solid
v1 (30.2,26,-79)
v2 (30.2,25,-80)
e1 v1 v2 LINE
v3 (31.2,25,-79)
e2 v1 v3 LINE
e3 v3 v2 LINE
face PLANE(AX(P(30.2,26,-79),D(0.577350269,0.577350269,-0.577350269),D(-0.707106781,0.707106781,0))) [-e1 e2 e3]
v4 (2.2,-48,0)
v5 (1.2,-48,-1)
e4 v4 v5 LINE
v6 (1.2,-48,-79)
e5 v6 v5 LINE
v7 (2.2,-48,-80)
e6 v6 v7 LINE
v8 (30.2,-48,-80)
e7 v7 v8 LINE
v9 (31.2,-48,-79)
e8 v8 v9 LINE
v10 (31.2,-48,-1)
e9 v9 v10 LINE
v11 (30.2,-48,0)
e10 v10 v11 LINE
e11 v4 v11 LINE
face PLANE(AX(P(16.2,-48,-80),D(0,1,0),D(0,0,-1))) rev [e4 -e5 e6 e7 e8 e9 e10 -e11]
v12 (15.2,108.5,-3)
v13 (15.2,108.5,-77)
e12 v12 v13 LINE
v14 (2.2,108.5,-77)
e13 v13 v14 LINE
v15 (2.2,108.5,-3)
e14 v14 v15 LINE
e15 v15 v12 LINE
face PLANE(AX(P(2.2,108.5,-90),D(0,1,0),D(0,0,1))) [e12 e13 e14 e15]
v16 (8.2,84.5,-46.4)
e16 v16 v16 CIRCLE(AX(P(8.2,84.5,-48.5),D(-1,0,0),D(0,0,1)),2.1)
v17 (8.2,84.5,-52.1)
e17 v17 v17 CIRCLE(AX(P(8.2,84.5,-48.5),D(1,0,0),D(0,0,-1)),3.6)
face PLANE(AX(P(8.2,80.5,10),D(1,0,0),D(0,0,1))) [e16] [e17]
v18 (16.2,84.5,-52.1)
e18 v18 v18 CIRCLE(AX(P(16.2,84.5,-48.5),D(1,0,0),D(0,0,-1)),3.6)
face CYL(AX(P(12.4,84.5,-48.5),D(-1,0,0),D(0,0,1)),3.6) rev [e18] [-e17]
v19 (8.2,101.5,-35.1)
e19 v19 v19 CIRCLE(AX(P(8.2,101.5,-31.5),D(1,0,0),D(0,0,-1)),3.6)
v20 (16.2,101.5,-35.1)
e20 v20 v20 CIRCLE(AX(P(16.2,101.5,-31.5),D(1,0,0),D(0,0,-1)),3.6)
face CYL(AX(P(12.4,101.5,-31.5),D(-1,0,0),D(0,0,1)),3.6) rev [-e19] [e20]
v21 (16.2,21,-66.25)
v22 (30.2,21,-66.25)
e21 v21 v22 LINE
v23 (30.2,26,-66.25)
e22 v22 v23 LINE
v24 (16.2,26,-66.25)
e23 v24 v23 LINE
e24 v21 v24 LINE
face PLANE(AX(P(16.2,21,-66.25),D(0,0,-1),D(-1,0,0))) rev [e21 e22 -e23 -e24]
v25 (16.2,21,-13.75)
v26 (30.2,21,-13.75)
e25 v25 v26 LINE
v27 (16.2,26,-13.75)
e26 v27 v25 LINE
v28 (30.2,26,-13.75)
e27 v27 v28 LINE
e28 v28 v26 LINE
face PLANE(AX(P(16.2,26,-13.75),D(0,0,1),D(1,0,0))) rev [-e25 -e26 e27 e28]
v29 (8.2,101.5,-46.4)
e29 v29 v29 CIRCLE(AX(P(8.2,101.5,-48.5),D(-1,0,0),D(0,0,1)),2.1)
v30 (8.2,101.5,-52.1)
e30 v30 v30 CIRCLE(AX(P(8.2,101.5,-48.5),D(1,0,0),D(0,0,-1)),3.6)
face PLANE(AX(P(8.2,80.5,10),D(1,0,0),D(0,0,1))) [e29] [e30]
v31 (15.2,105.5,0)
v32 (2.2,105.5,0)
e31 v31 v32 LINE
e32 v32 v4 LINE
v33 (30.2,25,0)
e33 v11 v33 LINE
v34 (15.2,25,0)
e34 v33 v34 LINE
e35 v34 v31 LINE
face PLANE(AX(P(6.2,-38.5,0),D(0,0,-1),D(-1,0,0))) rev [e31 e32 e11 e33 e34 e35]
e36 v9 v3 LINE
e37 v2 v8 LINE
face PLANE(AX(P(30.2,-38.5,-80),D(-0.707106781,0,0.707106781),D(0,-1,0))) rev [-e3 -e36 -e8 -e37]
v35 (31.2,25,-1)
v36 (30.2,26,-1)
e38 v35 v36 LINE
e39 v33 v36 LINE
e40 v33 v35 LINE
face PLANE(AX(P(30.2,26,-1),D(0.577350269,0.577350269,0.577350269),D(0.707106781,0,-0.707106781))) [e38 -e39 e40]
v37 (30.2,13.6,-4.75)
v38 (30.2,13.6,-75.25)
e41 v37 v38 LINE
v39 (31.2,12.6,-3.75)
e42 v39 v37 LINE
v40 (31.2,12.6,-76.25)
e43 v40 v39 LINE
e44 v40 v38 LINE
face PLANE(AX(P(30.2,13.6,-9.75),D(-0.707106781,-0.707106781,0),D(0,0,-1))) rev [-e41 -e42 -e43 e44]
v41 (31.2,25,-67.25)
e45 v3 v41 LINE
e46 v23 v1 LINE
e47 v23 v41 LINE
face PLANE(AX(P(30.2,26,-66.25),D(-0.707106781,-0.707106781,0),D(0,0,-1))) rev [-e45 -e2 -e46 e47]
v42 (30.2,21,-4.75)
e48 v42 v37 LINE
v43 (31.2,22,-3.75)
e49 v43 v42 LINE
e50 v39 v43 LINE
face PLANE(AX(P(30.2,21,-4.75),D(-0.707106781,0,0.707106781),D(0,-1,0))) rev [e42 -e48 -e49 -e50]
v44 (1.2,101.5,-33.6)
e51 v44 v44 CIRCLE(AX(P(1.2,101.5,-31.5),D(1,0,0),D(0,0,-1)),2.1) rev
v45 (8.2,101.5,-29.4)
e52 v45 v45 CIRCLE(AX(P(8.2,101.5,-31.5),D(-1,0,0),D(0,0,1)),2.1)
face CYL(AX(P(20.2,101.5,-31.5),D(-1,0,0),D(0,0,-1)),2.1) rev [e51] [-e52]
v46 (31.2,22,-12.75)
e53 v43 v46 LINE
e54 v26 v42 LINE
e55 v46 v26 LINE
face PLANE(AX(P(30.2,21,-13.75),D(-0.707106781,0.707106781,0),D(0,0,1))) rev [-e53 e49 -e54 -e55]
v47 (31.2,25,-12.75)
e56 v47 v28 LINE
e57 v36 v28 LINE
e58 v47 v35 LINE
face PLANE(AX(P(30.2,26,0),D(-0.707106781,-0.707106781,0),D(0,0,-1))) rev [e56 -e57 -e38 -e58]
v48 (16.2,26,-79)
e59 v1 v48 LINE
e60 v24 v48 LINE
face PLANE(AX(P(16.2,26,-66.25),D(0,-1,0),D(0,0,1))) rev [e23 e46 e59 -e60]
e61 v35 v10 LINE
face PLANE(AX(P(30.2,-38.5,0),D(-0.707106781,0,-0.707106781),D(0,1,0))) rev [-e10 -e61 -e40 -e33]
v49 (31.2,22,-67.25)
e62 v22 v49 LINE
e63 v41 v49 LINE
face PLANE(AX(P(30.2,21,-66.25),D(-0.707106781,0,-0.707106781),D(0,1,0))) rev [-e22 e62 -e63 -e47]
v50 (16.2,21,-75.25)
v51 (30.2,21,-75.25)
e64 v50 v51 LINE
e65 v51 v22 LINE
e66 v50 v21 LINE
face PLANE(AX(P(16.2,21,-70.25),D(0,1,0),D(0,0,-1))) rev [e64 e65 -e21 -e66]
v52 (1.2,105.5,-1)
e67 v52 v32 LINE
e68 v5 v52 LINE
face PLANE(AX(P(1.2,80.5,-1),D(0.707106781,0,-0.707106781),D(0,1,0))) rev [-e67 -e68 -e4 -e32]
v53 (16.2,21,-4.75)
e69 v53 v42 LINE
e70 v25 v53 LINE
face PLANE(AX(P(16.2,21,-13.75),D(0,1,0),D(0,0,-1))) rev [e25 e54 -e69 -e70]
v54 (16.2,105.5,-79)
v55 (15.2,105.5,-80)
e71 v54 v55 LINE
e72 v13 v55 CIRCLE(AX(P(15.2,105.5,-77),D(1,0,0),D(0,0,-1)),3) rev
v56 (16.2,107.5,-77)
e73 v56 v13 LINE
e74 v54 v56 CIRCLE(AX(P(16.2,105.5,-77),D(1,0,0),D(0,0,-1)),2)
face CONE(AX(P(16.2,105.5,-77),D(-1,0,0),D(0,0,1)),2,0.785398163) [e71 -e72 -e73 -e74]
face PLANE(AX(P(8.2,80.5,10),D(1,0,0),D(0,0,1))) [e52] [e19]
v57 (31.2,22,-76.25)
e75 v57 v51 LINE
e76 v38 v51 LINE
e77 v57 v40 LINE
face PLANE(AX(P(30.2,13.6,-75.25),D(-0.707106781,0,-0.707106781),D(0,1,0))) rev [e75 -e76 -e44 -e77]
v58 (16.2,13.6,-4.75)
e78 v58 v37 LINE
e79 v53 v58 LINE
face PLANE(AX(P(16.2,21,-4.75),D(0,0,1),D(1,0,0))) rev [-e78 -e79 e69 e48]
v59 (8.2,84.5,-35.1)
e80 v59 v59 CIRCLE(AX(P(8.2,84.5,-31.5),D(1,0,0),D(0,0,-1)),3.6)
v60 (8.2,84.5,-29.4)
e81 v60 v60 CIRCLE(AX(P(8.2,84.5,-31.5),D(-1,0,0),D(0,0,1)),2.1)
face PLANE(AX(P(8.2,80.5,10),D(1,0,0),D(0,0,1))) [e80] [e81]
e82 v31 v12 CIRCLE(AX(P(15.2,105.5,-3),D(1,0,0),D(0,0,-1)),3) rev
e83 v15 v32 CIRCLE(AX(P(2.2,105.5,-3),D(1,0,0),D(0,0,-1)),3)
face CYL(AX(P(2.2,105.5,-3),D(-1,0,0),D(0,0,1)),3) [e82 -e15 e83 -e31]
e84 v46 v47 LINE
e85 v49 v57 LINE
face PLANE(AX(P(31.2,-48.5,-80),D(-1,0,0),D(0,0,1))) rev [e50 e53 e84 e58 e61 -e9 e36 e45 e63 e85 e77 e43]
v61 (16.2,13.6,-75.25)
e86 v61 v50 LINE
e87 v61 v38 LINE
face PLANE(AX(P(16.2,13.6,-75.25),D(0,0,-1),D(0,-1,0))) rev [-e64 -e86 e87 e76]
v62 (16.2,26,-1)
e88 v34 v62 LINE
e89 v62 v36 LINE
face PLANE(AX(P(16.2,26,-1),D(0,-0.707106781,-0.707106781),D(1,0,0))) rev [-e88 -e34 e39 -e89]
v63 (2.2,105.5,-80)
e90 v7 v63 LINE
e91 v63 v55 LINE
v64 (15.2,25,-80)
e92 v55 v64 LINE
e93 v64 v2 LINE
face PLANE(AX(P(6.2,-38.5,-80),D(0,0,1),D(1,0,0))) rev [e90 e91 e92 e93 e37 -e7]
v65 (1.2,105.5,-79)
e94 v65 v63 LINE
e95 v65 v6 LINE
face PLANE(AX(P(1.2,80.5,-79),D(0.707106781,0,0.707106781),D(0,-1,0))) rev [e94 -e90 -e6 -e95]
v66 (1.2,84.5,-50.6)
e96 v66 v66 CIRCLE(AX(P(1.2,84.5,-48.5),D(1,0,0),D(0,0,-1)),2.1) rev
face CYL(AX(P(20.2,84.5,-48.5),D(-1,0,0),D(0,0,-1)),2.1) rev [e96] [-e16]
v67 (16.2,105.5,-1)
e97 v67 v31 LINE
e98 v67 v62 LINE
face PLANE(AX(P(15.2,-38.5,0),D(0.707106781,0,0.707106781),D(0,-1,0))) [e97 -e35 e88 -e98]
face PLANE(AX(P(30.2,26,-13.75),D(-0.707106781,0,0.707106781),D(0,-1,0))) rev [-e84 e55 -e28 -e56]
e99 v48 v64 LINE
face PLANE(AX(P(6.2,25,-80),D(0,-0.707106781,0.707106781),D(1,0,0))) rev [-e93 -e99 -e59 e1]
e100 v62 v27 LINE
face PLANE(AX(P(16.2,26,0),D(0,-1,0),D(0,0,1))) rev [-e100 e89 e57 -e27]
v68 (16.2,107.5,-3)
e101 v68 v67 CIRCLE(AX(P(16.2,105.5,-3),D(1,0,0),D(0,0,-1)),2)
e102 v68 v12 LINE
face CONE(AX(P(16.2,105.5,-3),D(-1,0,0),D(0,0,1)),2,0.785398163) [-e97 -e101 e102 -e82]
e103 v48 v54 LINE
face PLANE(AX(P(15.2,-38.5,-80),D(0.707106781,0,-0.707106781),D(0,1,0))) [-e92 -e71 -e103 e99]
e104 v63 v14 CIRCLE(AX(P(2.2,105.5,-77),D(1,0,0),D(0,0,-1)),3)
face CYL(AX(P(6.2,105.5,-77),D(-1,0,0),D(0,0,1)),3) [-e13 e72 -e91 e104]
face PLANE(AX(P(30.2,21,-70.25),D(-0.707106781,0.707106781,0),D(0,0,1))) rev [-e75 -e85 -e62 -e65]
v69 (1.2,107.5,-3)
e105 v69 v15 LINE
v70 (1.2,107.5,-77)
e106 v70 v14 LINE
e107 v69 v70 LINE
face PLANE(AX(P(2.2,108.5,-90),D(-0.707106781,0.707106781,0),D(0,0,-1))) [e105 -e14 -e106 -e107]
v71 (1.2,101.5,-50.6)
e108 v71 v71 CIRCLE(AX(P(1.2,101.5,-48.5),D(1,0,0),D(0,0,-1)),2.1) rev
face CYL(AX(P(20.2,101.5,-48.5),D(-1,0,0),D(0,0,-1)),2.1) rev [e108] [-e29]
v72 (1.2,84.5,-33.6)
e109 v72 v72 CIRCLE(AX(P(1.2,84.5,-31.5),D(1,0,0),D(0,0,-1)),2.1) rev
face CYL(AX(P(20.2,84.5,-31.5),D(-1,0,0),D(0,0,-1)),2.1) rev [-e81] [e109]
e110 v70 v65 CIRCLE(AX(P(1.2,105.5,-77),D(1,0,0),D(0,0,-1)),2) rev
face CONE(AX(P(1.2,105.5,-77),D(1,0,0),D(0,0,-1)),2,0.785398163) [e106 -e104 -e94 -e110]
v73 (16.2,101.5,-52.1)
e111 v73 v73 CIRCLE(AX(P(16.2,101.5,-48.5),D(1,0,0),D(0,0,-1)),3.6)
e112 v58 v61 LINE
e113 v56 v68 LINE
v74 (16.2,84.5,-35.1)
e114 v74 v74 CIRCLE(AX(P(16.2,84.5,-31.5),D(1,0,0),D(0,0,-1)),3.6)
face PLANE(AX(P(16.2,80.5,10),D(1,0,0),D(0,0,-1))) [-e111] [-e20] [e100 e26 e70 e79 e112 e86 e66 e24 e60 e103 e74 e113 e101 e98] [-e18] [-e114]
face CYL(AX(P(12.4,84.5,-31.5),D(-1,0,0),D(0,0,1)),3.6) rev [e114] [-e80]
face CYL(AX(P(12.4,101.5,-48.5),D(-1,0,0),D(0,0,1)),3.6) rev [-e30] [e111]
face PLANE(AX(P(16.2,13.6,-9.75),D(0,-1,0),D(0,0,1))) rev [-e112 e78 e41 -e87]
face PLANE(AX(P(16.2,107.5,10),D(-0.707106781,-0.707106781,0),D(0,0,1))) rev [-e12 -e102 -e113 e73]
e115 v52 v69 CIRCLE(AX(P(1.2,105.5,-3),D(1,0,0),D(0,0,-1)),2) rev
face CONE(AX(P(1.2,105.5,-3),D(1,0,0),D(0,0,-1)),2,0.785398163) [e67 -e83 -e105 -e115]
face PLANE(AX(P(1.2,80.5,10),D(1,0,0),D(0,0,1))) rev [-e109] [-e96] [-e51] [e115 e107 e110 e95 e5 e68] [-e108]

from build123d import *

# Parameters (mm, degrees)
SKETCH1_W               = 100
SKETCH1_H               = 26
BOSS_EXTRUDE1_DEPTH     = 2
BOSS_EXTRUDE2_DEPTH     = 100
SKETCH3_W               = 25
SKETCH3_H               = 28
BOSS_EXTRUDE3_DEPTH     = 4
SKETCH4_R               = 2.1
CUT_EXTRUDE1_DEPTH      = 106.39449701
CUT_EXTRUDE2_DEPTH      = 105.537074763
CUT_EXTRUDE2_DEPTH_BACK = 105.537074763
SKETCH5_W               = 120
SKETCH5_H               = 46
SKETCH5_W_2             = 100
SKETCH5_H_2             = 26
SKETCH6_W               = 100
SKETCH6_H               = 26
SKETCH6_R               = 3.6
BOSS_EXTRUDE4_DEPTH     = 4.2
SKETCH8_W               = 100
SKETCH8_H               = 4
BOSS_EXTRUDE5_DEPTH     = 6
SKETCH9_W               = 100
SKETCH9_H               = 4
BOSS_EXTRUDE6_DEPTH     = 10.2
SKETCH10_W              = 4
SKETCH10_H              = 37.5
CUT_EXTRUDE3_DEPTH      = 106.682732743
SKETCH11_W              = 4
SKETCH11_H              = 25
CUT_EXTRUDE4_DEPTH      = 107.737247482
SKETCH13_W              = 10
SKETCH13_H              = 10
BOSS_EXTRUDE7_DEPTH     = 6.2
SKETCH14_W              = 4.2
SKETCH14_H              = 35.5
CUT_EXTRUDE5_DEPTH      = 107.737247482
SKETCH15_W              = 6
SKETCH15_H              = 100
CUT_EXTRUDE6_DEPTH      = 109.576424697
PODPORA_START           = -80
PODPORA_DEPTH           = 80
PODPORA_2_OUTLINE_W     = 10
PODPORA_2_OUTLINE_H     = 12.4
PODPORA_2_DEPTH         = 9.75
PODPORA_START_2         = -9.75
PODPORA_3_OUTLINE_W     = 10
PODPORA_3_OUTLINE_H     = 12.4
PODPORA_3_DEPTH         = 9.75
PODPORA_START_3         = -70.25
PODPORA_4_OUTLINE_W     = 10
PODPORA_4_OUTLINE_H     = 5
PODPORA_4_DEPTH         = 4
PODPORA_START_4         = -13.75
PODPORA_5_OUTLINE_W     = 10
PODPORA_5_OUTLINE_H     = 5
PODPORA_5_DEPTH         = 4
SKETCH16_W              = 80
SKETCH16_H              = 115
BOSS_EXTRUDE8_DEPTH     = 10
MOVE_FACE1_BY           = 10
MOVE_FACE2_BY           = 5
SKETCH17_W              = 10
SKETCH17_H              = 30
CUT_EXTRUDE7_DEPTH      = 150.52822476
MOVE_START              = 12.4
MOVE_FACE3_OUTLINE_R    = 3.6
MOVE_FACE3_DEPTH        = 3.8
SKETCH18_W              = 35.995257081
SKETCH18_H              = 98.541471116
CUT_EXTRUDE8_DEPTH      = 178.196049617
MOVE_FACE4_BY           = 4
DELETEFACE1_START       = 6.2
DELETEFACE1_OUTLINE_W   = 30
DELETEFACE1_OUTLINE_H   = 25.5
DELETEFACE1_DEPTH       = 4.2
SKETCH19_W              = 80
SKETCH19_H              = 10
CUT_EXTRUDE9_DEPTH      = 136.525827797
MOVE_START_2            = 106.5
MOVE_FACE5_OUTLINE_W    = 10
MOVE_FACE5_OUTLINE_H    = 80
MOVE_FACE5_DEPTH        = 2
FILLET1_R               = 3
MOVE_START_3            = -48.5
MOVE_FACE6_OUTLINE_W    = 25
MOVE_FACE6_OUTLINE_H    = 80
MOVE_FACE6_DEPTH        = 0.5
MOVE_START_4            = 1.2
MOVE_FACE7_OUTLINE_R    = 2.1
MOVE_FACE7_DEPTH        = 5
MOVE_FACE8_BY           = 5
MOVE_FACE8_2_BY         = 5
CHAMFER1_SIZE           = 1


with BuildPart() as part:
    # Sketch1 → Boss-Extrude1 (new body)
    with BuildSketch(Plane(origin=(0, 0, 0), x_dir=(0, 0, -1), z_dir=(1, 0, 0))):
        with Locations((50, 13)):
            Rectangle(SKETCH1_W, SKETCH1_H)
    extrude(amount=BOSS_EXTRUDE1_DEPTH)

    # Sketch2 → Boss-Extrude2 (add)
    with BuildSketch(Plane.XY):
        Polygon((2, 26), (2, 28), (-12, 28), (-12, 24), (-10, 24), (-10, 26), align=None)
    extrude(amount=-BOSS_EXTRUDE2_DEPTH)

    # Sketch3 → Boss-Extrude3 (add)
    with BuildSketch(Plane(origin=(2, 0, 0), x_dir=(0, 0, -1), z_dir=(1, 0, 0))):
        with Locations((50, 14)):
            Rectangle(SKETCH3_W, SKETCH3_H)
    extrude(amount=BOSS_EXTRUDE3_DEPTH)

    # Sketch4 → Cut-Extrude1 (cut, through all)
    with BuildSketch(Plane(origin=(6, 0, 0), x_dir=(0, 0, -1), z_dir=(1, 0, 0))):
        with Locations((41.5, 21)):
            Circle(SKETCH4_R)
        with Locations((58.5, 21)):
            Circle(SKETCH4_R)
        with Locations((58.5, 4)):
            Circle(SKETCH4_R)
        with Locations((41.5, 4)):
            Circle(SKETCH4_R)
    extrude(amount=-CUT_EXTRUDE1_DEPTH, mode=Mode.SUBTRACT)


with BuildPart() as body_2:
    # Mirror1: mirrored copy
    add(part.part.mirror(Plane(origin=(6, 0, 0), x_dir=(0, 0, 1), z_dir=(1, 0, 0))))

    # Sketch5 → Cut-Extrude2 (cut, two sides: drawn at the far end of the back side and taken through both)
    with BuildSketch(Plane(origin=(12, 0, 0), x_dir=(0, 0, -1), z_dir=(1, 0, 0)).offset(-CUT_EXTRUDE2_DEPTH_BACK)):
        with Locations((50, 13)):
            Rectangle(SKETCH5_W, SKETCH5_H)
        with Locations((50, 13)):
            Rectangle(SKETCH5_W_2, SKETCH5_H_2, mode=Mode.SUBTRACT)
    extrude(amount=CUT_EXTRUDE2_DEPTH + CUT_EXTRUDE2_DEPTH_BACK, mode=Mode.SUBTRACT)


with BuildPart() as body_2_2:
    # of the pieces the cut leaves, the one that is kept (cut_extrude2_keep)
    add(body_2.part.solids().sort_by_distance((12, 0, 0))[0])

    # Sketch6 → Boss-Extrude4 (add)
    with BuildSketch(Plane(origin=(12, 0, 0), x_dir=(0, 0, -1), z_dir=(1, 0, 0))):
        with Locations((50, 13)):
            Rectangle(SKETCH6_W, SKETCH6_H)
        with Locations((41.5, 21)):
            Circle(SKETCH6_R, mode=Mode.SUBTRACT)
        with Locations((58.5, 21)):
            Circle(SKETCH6_R, mode=Mode.SUBTRACT)
        with Locations((58.5, 4)):
            Circle(SKETCH6_R, mode=Mode.SUBTRACT)
        with Locations((41.5, 4)):
            Circle(SKETCH6_R, mode=Mode.SUBTRACT)
    extrude(amount=BOSS_EXTRUDE4_DEPTH)



with BuildPart() as body_2_3:
    # Sketch8 → Boss-Extrude5 (new body)
    with BuildSketch(Plane(origin=(16.2, 0, 0), x_dir=(0, 0, -1), z_dir=(1, 0, 0))):
        with Locations((50, -2)):
            Rectangle(SKETCH8_W, SKETCH8_H)
    extrude(amount=BOSS_EXTRUDE5_DEPTH)


with BuildPart() as body_2_2_1:
    add(body_2_2.part)

    add(body_2_3.part)  # Boss-Extrude6 merges body 2 3
    # Sketch9 → Boss-Extrude6 (add)
    with BuildSketch(Plane.ZY.offset(-16.2)):
        with Locations((-50, -2)):
            Rectangle(SKETCH9_W, SKETCH9_H)
    extrude(amount=BOSS_EXTRUDE6_DEPTH)

    # Sketch10 → Cut-Extrude3 (cut, through all)
    with BuildSketch(Plane(origin=(0, 0, 0), x_dir=(1, 0, 0), z_dir=(0, 1, 0))):
        with Locations((8, 81.25)):
            Rectangle(SKETCH10_W, SKETCH10_H)
        with Locations((8, 18.75)):
            Rectangle(SKETCH10_W, SKETCH10_H)
    extrude(amount=-CUT_EXTRUDE3_DEPTH, mode=Mode.SUBTRACT)

    # Sketch11 → Cut-Extrude4 (cut, through all)
    with BuildSketch(Plane(origin=(0, 26, 0), x_dir=(1, 0, 0), z_dir=(0, 1, 0))):
        with Locations((8, 50)):
            Rectangle(SKETCH11_W, SKETCH11_H)
    extrude(amount=-CUT_EXTRUDE4_DEPTH, mode=Mode.SUBTRACT)

    # Sketch13 → Boss-Extrude7 (add)
    with BuildSketch(Plane.ZY.offset(-10)):
        with Locations((-50, 31)):
            Rectangle(SKETCH13_W, SKETCH13_H)
    extrude(amount=-BOSS_EXTRUDE7_DEPTH)

    # Sketch14 → Cut-Extrude5 (cut, through all)
    with BuildSketch(Plane(origin=(0, 26, 0), x_dir=(1, 0, 0), z_dir=(0, 1, 0))):
        with Locations((12.1, 17.75)):
            Rectangle(SKETCH14_W, SKETCH14_H)
        with Locations((12.1, 82.25)):
            Rectangle(SKETCH14_W, SKETCH14_H)
    extrude(amount=-CUT_EXTRUDE5_DEPTH, mode=Mode.SUBTRACT)

    # Sketch15 → Cut-Extrude6 (cut, through all)
    with BuildSketch(Plane(origin=(0, 0, 0), x_dir=(1, 0, 0), z_dir=(0, 1, 0))):
        with Locations((19.2, 50)):
            Rectangle(SKETCH15_W, SKETCH15_H)
    extrude(amount=-CUT_EXTRUDE6_DEPTH, mode=Mode.SUBTRACT)


with BuildPart() as body_2_4:
    # podpora: read off the stored shape, not the designer's step
    # podpora outline → podpora (new body)
    with BuildSketch(Plane.XY.offset(PODPORA_START)):
        Polygon((-3.8, -48.5), (26.2, -48.5), (26.2, 13.6), (16.2, 13.6), (16.2, -38.5), (-3.8, -38.5), align=None)
    extrude(amount=PODPORA_DEPTH)

    # podpora 2 outline → podpora 2 (add)
    with BuildSketch(Plane.XY.offset(PODPORA_START)):
        with Locations((21.2, 19.8)):
            Rectangle(PODPORA_2_OUTLINE_W, PODPORA_2_OUTLINE_H)
    extrude(amount=PODPORA_2_DEPTH)

    # podpora 3 outline → podpora 3 (add)
    with BuildSketch(Plane.XY.offset(PODPORA_START_2)):
        with Locations((21.2, 19.8)):
            Rectangle(PODPORA_3_OUTLINE_W, PODPORA_3_OUTLINE_H)
    extrude(amount=PODPORA_3_DEPTH)

    # podpora 4 outline → podpora 4 (add)
    with BuildSketch(Plane.XY.offset(PODPORA_START_3)):
        with Locations((21.2, 23.5)):
            Rectangle(PODPORA_4_OUTLINE_W, PODPORA_4_OUTLINE_H)
    extrude(amount=PODPORA_4_DEPTH)

    # podpora 5 outline → podpora 5 (add)
    with BuildSketch(Plane.XY.offset(PODPORA_START_4)):
        with Locations((21.2, 23.5)):
            Rectangle(PODPORA_5_OUTLINE_W, PODPORA_5_OUTLINE_H)
    extrude(amount=PODPORA_5_DEPTH)

    # Move Face1: a face moved outward by 10.0
    extrude(body_2_4.faces().sort_by_distance((-3.8, -43.5, -40))[0], amount=MOVE_FACE1_BY, dir=(-1, 0, 0))

    # Move Face2: a face moved outward by 5.0
    extrude(body_2_4.faces().sort_by_distance((26.2, -15.422294183, -40))[0], amount=MOVE_FACE2_BY, dir=(1, 0, 0))


with BuildPart() as body_2_2_2:
    # Body-Move/Copy3: moved
    add(body_2_2_1.part.moved(Location((0, 0, 10))))


with BuildPart() as body_2_2_3:
    # Body-Move/Copy4: read off the stored shape, not the designer's step
    # Body-Move/Copy4: moved
    add(body_2_2_2.part.moved(Location((0, 17.6, 0))))


with BuildPart() as body_3:
    # Sketch16 → Boss-Extrude8 (new body)
    with BuildSketch(Plane.ZY.offset(-16.2)):
        with Locations((-40, 19)):
            Rectangle(SKETCH16_W, SKETCH16_H)
    extrude(amount=BOSS_EXTRUDE8_DEPTH)

    # Combine1: union body 2 4
    add(body_2_4.part)


with BuildPart() as body_2_2_4:
    # Body-Move/Copy5: read off the stored shape, not the designer's step
    # Body-Move/Copy5: moved
    add(body_2_2_3.part.moved(Location((0, 62.9, 0))))


with BuildPart() as body_2_2_5:
    # Body-Move/Copy6: read off the stored shape, not the designer's step
    # Body-Move/Copy6: moved
    add(body_2_2_4.part.moved(Location((-3.8, 0, 0))))

    # Combine2: union body 3
    add(body_3.part)

    # Sketch17 → Cut-Extrude7 (cut, through all)
    with BuildSketch(Plane(origin=(12.4, 0, 0), x_dir=(0, 0, -1), z_dir=(1, 0, 0))):
        with Locations((-5, 91.5)):
            Rectangle(SKETCH17_W, SKETCH17_H)
        with Locations((85, 91.5)):
            Rectangle(SKETCH17_W, SKETCH17_H)
    extrude(amount=-CUT_EXTRUDE7_DEPTH, mode=Mode.SUBTRACT)

    # Move Face3: read off the stored shape, not the designer's step
    # Move Face3 outline → Move Face3 (add)
    with BuildSketch(Plane.YZ.offset(MOVE_START)):
        Polygon((116.5, -35), (106.5, -35), (106.5, 0), (76.5, 0), (76.5, -80), (106.5, -80), (106.5, -45), (116.5, -45), align=None)
        with Locations((84.5, -48.5)):
            Circle(MOVE_FACE3_OUTLINE_R, mode=Mode.SUBTRACT)
        with Locations((101.5, -48.5)):
            Circle(MOVE_FACE3_OUTLINE_R, mode=Mode.SUBTRACT)
        with Locations((84.5, -31.5)):
            Circle(MOVE_FACE3_OUTLINE_R, mode=Mode.SUBTRACT)
        with Locations((101.5, -31.5)):
            Circle(MOVE_FACE3_OUTLINE_R, mode=Mode.SUBTRACT)
    extrude(amount=MOVE_FACE3_DEPTH)

    # Sketch18 → Cut-Extrude8 (cut, through all)
    with BuildSketch(Plane(origin=(0, 106.5, 0), x_dir=(1, 0, 0), z_dir=(0, 1, 0))):
        with Locations((13.065761379, 40)):
            Rectangle(SKETCH18_W, SKETCH18_H)
    extrude(amount=CUT_EXTRUDE8_DEPTH, mode=Mode.SUBTRACT)

    # Move Face4: a face moved outward by 4.0
    extrude(body_2_2_5.faces().sort_by_distance((-13.8, -43.5, -40))[0], amount=MOVE_FACE4_BY, dir=(-1, 0, 0))

    # DeleteFace1: read off the stored shape, not the designer's step
    # DeleteFace1 outline → DeleteFace1 (add)
    with BuildSketch(Plane.YZ.offset(DELETEFACE1_START)):
        with Locations((91.5, -67.25)):
            Rectangle(DELETEFACE1_OUTLINE_W, DELETEFACE1_OUTLINE_H)
        with Locations((91.5, -12.75)):
            Rectangle(DELETEFACE1_OUTLINE_W, DELETEFACE1_OUTLINE_H)
    extrude(amount=DELETEFACE1_DEPTH)

    # Sketch19 → Cut-Extrude9 (cut, through all)
    with BuildSketch(Plane.ZY.offset(-6.2)):
        with Locations((-40, -43.5)):
            Rectangle(SKETCH19_W, SKETCH19_H)
    extrude(amount=CUT_EXTRUDE9_DEPTH, mode=Mode.SUBTRACT)

    # Move Face5: read off the stored shape, not the designer's step
    # Move Face5 outline → Move Face5 (add)
    with BuildSketch(Plane(origin=(0, 0, 0), x_dir=(1, 0, 0), z_dir=(0, 1, 0)).offset(MOVE_START_2)):
        with Locations((11.2, 40)):
            Rectangle(MOVE_FACE5_OUTLINE_W, MOVE_FACE5_OUTLINE_H)
    extrude(amount=MOVE_FACE5_DEPTH)

    # Fillet1
    fillet1_edges = [body_2_2_5.edges().sort_by_distance(p)[0] for p in [
        (11.2, 108.5, 0),
        (11.2, 108.5, -80),
    ]]
    fillet(fillet1_edges, radius=FILLET1_R)

    # Move Face6: read off the stored shape, not the designer's step
    # Move Face6 outline → Move Face6 (cut)
    with BuildSketch(Plane(origin=(0, 0, 0), x_dir=(1, 0, 0), z_dir=(0, 1, 0)).offset(MOVE_START_3)):
        with Locations((18.7, 40)):
            Rectangle(MOVE_FACE6_OUTLINE_W, MOVE_FACE6_OUTLINE_H)
    extrude(amount=MOVE_FACE6_DEPTH, mode=Mode.SUBTRACT)

    # Move Face7: read off the stored shape, not the designer's step
    # Move Face7 outline → Move Face7 (add)
    with BuildSketch(Plane.YZ.offset(MOVE_START_4)):
        with BuildLine():
            Line((-48, -80), (105.5, -80))
            ThreePointArc((105.5, -80), (107.621320344, -79.121320344), (108.5, -77))
            Line((108.5, -77), (108.5, -3))
            ThreePointArc((108.5, -3), (107.621320344, -0.878679656), (105.5, 0))
            Line((105.5, 0), (-48, 0))
            Line((-48, 0), (-48, -80))
        make_face()
        with Locations((84.5, -48.5)):
            Circle(MOVE_FACE7_OUTLINE_R, mode=Mode.SUBTRACT)
        with Locations((101.5, -48.5)):
            Circle(MOVE_FACE7_OUTLINE_R, mode=Mode.SUBTRACT)
        with Locations((84.5, -31.5)):
            Circle(MOVE_FACE7_OUTLINE_R, mode=Mode.SUBTRACT)
        with Locations((101.5, -31.5)):
            Circle(MOVE_FACE7_OUTLINE_R, mode=Mode.SUBTRACT)
    extrude(amount=MOVE_FACE7_DEPTH)

    # Move Face8: a face moved inward by 5.0
    extrude(body_2_2_5.faces().sort_by_distance((23.7, 17.3, -70.25))[0], amount=MOVE_FACE8_BY, dir=(0, 0, -1), mode=Mode.SUBTRACT)

    # Move Face8 2: a face moved inward by 5.0
    extrude(body_2_2_5.faces().sort_by_distance((23.7, 17.3, -9.75))[0], amount=MOVE_FACE8_2_BY, dir=(0, 0, 1), mode=Mode.SUBTRACT)

    # Chamfer1
    chamfer1_edges = [body_2_2_5.edges().sort_by_distance(p)[0] for p in [
        (23.7, 26, -80),
        (31.2, -11, -80),
        (31.2, -11, 0),
        (16.2, 65.75, 0),
        (1.2, 28.75, 0),
        (31.2, 26, -6.875),
        (23.7, 26, 0),
        (31.2, 23.5, -13.75),
        (31.2, 21, -9.25),
        (31.2, 17.3, -4.75),
        (31.2, 13.6, -40),
        (31.2, 17.3, -75.25),
        (31.2, 21, -70.75),
        (31.2, 23.5, -66.25),
        (31.2, 26, -73.125),
        (1.2, 108.5, -40),
        (16.2, 108.5, -40),
        (16.2, 65.75, -80),
        (16.2, 107.621320344, -79.121320344),
        (16.2, 107.621320344, -0.878679656),
        (1.2, 28.75, -80),
        (1.2, 107.621320344, -79.121320344),
        (1.2, 107.621320344, -0.878679656),
    ]]
    chamfer(chamfer1_edges, length=CHAMFER1_SIZE)


solid = body_2_2_5.part
